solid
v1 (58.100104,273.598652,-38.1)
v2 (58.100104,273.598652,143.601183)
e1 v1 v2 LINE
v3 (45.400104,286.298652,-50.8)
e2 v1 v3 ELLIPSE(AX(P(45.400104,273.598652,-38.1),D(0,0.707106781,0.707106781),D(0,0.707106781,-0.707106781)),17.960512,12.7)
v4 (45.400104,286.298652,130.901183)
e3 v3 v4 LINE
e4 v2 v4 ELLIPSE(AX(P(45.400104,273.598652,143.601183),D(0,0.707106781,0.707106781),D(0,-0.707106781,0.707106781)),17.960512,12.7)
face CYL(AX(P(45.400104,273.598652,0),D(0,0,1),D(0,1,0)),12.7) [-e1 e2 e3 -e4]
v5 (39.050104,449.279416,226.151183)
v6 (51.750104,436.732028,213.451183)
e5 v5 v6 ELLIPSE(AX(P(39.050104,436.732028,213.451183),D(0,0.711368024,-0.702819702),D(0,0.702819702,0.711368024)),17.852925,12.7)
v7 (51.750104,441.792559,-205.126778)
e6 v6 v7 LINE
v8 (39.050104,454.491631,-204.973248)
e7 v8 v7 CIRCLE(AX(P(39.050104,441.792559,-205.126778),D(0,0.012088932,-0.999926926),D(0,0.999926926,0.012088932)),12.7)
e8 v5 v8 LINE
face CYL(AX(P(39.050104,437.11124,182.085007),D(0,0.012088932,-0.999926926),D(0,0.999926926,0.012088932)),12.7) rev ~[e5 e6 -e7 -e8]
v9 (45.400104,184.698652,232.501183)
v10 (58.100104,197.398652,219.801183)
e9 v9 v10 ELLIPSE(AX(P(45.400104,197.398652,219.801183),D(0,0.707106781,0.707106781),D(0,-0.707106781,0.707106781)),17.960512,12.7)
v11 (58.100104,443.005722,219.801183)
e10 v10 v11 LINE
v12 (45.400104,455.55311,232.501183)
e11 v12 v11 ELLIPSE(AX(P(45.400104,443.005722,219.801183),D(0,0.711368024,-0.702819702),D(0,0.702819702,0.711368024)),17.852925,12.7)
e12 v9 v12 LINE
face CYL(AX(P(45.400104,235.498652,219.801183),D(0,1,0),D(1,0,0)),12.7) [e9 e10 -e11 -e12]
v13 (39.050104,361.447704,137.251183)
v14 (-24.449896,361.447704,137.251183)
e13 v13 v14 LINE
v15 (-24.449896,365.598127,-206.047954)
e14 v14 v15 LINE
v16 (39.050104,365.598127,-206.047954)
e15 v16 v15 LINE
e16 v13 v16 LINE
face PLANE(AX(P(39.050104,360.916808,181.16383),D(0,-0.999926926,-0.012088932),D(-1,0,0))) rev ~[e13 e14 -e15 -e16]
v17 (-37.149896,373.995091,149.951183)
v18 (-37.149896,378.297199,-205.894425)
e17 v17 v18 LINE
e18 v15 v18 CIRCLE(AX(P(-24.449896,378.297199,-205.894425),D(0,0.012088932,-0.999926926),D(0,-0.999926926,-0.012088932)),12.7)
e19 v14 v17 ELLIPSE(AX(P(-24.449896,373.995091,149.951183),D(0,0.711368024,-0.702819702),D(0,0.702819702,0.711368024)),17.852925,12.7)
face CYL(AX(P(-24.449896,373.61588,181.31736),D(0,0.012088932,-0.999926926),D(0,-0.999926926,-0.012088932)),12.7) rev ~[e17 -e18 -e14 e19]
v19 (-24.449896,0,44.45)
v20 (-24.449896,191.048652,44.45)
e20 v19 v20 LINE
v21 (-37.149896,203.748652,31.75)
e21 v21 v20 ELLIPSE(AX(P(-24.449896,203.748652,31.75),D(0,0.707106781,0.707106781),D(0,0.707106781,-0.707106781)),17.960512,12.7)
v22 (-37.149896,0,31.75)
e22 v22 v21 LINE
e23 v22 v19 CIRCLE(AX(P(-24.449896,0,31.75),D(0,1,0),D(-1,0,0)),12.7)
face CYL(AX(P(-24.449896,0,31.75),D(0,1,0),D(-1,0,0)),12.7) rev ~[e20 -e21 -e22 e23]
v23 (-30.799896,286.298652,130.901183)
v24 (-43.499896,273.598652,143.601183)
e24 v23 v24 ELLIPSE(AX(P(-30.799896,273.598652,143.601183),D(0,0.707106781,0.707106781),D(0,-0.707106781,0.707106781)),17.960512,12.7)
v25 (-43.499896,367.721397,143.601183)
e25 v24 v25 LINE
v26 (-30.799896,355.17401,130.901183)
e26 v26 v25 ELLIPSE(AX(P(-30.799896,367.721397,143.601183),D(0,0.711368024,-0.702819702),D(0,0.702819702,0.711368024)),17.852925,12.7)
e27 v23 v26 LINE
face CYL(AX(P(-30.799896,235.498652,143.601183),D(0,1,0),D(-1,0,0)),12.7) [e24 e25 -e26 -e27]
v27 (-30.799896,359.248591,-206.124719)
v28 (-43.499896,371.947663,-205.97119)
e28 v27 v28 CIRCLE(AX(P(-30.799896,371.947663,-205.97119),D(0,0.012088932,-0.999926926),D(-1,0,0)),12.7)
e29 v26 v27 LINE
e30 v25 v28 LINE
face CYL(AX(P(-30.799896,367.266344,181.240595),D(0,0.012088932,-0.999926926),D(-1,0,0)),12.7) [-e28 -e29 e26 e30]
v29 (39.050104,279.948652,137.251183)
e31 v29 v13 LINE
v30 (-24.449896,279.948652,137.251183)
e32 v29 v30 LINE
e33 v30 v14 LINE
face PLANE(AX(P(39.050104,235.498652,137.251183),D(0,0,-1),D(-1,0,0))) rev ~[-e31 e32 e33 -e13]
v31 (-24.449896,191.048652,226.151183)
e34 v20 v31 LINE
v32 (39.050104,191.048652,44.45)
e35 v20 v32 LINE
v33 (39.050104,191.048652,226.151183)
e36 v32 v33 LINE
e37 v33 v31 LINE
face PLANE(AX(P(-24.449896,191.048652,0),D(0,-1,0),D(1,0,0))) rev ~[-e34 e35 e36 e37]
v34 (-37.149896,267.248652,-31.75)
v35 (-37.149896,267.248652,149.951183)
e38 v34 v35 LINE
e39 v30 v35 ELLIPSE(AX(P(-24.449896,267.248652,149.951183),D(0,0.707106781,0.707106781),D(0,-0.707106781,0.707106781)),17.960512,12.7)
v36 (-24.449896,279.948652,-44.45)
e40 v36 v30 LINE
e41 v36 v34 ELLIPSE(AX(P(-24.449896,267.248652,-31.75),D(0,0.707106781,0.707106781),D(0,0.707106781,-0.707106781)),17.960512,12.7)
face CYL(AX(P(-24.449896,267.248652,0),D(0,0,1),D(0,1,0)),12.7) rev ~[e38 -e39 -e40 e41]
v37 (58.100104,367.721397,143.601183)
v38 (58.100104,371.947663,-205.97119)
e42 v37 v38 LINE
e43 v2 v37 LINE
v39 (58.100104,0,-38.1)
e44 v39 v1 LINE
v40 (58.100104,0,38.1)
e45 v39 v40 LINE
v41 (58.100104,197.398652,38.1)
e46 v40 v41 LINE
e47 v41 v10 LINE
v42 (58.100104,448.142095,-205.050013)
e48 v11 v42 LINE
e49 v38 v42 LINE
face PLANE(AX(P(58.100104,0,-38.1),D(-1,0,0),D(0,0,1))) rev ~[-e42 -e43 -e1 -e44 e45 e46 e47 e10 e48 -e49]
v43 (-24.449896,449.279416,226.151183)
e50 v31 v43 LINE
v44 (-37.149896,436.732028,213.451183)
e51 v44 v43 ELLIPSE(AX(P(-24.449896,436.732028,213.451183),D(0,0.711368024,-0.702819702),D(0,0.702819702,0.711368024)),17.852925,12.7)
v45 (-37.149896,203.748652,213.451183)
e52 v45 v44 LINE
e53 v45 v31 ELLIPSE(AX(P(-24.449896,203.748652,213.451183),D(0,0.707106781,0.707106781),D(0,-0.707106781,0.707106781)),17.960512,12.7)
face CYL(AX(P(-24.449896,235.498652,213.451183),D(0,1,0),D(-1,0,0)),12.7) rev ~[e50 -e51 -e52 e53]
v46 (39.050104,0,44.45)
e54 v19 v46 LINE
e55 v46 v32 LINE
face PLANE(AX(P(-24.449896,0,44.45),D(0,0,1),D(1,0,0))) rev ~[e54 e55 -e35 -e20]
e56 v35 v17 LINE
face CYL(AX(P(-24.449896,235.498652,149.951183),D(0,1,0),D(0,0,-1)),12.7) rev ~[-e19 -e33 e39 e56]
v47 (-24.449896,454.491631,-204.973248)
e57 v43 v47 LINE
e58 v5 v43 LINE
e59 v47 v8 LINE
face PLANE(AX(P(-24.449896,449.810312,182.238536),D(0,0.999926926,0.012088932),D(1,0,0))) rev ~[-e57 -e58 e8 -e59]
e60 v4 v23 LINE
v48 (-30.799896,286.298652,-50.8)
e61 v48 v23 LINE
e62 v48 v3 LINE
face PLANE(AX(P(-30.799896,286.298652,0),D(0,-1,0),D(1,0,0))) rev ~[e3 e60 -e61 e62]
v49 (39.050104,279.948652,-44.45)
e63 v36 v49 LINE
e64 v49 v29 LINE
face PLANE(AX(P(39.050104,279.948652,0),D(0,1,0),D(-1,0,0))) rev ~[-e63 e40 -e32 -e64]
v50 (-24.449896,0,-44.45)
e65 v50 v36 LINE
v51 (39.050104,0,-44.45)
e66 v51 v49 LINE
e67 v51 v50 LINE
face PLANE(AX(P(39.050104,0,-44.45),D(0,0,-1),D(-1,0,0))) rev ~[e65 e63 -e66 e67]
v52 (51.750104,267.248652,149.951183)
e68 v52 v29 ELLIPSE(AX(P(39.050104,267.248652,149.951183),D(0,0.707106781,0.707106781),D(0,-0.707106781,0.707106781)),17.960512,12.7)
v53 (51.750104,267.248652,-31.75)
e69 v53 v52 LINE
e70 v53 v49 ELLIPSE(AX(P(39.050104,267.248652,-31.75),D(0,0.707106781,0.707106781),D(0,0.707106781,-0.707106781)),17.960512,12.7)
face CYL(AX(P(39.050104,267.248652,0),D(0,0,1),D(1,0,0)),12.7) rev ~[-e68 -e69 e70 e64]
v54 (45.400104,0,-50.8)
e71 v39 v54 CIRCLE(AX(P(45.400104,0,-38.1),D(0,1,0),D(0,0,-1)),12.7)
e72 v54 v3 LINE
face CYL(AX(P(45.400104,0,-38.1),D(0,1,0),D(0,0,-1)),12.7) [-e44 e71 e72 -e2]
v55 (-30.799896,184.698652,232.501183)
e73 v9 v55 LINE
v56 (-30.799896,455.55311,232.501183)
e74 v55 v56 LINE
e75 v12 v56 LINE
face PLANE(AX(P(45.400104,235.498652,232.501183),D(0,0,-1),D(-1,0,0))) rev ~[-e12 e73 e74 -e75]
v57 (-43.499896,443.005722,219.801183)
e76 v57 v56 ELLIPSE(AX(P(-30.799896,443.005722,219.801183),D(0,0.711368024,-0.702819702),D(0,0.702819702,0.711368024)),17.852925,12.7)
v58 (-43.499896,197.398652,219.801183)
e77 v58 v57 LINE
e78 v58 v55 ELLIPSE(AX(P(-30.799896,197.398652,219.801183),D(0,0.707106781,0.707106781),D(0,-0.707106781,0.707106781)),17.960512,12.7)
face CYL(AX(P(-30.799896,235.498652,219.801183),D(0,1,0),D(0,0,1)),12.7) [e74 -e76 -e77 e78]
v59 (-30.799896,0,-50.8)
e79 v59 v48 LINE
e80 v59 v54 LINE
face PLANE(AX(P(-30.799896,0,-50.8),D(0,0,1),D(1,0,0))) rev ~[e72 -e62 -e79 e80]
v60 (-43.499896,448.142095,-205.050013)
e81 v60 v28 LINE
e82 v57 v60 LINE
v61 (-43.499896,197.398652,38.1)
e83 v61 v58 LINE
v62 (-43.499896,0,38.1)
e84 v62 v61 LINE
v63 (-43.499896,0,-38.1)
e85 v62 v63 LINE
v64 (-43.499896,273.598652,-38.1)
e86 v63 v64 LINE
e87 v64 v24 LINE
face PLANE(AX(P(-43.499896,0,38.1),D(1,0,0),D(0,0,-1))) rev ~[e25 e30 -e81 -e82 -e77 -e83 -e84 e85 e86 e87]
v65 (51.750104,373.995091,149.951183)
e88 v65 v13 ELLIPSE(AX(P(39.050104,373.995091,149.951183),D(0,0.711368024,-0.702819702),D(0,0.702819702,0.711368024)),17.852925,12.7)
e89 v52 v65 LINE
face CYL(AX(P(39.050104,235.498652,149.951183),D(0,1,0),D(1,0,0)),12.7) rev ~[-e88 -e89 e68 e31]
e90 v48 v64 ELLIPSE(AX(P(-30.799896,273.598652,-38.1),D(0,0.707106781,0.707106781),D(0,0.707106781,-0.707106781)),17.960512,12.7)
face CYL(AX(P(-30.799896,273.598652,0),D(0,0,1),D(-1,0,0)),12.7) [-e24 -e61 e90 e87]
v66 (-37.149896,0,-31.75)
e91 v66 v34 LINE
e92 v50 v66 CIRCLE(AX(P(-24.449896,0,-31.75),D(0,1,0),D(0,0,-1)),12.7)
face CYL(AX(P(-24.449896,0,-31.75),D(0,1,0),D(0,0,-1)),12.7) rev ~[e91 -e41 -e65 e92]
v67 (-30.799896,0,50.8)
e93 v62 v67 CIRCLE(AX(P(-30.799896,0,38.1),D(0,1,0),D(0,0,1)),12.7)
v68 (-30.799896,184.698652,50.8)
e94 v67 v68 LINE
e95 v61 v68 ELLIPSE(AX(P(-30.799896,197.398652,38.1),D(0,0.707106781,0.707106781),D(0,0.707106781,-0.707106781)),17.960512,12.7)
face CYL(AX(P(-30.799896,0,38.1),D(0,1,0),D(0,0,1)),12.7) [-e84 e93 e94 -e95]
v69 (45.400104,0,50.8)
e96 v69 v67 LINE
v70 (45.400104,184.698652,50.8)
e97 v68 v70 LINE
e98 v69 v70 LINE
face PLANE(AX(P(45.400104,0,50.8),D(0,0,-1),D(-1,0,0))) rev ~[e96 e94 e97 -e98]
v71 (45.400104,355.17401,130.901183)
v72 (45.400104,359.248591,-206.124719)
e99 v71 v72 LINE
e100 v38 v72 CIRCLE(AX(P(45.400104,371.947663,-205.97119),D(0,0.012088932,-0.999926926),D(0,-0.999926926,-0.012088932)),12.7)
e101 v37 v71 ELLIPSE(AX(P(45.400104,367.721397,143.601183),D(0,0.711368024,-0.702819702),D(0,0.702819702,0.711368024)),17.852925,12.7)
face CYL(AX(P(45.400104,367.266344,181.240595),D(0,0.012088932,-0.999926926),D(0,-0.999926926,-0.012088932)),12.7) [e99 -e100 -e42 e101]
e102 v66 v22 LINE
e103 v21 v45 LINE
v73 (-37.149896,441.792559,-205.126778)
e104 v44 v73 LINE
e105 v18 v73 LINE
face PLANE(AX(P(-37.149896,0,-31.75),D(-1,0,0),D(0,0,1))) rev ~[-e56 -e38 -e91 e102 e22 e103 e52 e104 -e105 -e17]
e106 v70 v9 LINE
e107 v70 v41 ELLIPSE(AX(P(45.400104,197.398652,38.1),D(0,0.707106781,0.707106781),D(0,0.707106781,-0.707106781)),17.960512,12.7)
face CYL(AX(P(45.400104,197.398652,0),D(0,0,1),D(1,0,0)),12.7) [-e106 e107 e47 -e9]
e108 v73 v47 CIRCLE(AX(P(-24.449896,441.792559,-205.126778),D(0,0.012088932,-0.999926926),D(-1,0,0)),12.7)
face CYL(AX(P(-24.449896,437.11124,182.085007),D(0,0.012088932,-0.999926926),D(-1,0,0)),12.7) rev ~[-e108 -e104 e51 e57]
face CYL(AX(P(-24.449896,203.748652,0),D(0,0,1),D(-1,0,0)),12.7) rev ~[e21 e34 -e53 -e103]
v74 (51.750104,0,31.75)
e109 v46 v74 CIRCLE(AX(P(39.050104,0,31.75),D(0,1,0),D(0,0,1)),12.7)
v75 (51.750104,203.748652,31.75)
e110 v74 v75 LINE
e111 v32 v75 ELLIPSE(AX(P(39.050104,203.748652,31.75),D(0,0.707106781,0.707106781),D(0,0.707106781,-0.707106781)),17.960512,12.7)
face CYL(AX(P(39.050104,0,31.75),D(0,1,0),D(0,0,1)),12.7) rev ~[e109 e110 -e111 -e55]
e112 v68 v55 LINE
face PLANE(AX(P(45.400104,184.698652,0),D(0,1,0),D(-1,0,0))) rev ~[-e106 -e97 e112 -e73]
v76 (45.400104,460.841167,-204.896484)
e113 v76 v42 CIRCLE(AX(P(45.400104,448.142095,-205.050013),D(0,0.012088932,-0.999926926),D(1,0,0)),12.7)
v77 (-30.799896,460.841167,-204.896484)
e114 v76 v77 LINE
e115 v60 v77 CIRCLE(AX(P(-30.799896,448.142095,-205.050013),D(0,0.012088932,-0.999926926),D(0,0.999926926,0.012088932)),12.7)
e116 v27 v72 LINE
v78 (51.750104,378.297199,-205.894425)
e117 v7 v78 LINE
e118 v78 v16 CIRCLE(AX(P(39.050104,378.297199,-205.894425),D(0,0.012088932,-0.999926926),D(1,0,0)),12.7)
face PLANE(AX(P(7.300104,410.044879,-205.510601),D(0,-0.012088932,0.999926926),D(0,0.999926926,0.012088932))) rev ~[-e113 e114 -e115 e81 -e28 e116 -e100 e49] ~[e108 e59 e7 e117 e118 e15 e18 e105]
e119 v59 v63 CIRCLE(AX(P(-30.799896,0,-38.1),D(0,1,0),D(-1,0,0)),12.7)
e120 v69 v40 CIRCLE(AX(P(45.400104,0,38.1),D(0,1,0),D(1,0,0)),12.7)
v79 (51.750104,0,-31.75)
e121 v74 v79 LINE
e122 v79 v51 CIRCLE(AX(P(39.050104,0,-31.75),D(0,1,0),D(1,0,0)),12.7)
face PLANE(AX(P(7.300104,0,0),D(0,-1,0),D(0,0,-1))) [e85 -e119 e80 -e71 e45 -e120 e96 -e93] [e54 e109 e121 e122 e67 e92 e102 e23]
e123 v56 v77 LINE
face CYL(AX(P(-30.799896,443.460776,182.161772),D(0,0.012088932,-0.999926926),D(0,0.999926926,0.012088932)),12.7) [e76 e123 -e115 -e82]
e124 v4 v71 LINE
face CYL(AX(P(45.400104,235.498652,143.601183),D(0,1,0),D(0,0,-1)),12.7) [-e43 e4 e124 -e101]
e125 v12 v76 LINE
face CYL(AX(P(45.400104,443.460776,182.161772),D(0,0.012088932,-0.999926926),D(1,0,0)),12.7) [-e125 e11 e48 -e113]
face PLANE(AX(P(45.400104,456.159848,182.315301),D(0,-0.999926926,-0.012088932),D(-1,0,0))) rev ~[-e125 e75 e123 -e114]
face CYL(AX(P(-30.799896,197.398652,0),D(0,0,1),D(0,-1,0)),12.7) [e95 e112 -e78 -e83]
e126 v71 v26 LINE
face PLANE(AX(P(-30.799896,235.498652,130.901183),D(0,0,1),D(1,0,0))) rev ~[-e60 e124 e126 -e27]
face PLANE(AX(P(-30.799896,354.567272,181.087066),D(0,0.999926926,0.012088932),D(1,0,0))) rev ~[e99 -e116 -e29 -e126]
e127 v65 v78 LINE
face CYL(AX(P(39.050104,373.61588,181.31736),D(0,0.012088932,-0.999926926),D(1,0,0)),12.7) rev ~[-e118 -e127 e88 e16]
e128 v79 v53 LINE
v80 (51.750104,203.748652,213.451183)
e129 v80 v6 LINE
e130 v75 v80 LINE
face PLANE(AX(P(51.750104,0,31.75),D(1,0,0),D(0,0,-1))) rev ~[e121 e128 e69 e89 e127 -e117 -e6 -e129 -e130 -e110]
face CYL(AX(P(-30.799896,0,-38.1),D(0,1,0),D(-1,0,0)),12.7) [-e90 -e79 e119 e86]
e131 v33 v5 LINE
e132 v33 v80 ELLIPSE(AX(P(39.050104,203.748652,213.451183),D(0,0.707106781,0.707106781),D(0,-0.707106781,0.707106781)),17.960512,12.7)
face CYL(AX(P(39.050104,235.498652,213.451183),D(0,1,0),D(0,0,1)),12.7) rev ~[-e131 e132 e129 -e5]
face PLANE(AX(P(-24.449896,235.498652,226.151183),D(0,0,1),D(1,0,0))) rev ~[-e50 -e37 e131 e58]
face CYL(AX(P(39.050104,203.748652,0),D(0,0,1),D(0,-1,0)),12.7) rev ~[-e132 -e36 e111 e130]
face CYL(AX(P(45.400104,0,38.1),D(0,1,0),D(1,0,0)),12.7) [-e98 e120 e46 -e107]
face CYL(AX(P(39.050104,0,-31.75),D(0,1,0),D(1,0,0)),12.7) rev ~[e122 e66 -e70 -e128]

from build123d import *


with BuildPart() as f2:
    # F2: sweep along a path in F1
    with BuildLine(Plane.YZ) as f2_path:
        Line((0, 0), (235.4986518621, 0))
        Line((235.4986518621, 0), (235.4986518621, 181.7011833191))
        Line((235.4986518621, 181.7011833191), (405.3635597229, 181.7011833191))
        Line((405.3635597229, 181.7011833191), (410.0448787212, -205.5106014013))
    # F0 (on Front) → F2 (sweep)
    with BuildSketch(Plane.XZ):
        with BuildLine():
            Line((-43.4998961684, 38.1), (-43.4998961684, -38.1))
            ThreePointArc((-43.4998961684, -38.1), (-39.7801522895, -47.0802561211), (-30.7998961684, -50.8))
            Line((-30.7998961684, -50.8), (45.4001038316, -50.8))
            ThreePointArc((45.4001038316, -50.8), (54.3803599527, -47.0802561211), (58.1001038316, -38.1))
            Line((58.1001038316, -38.1), (58.1001038316, 38.1))
            ThreePointArc((58.1001038316, 38.1), (54.3803599527, 47.0802561211), (45.4001038316, 50.8))
            Line((45.4001038316, 50.8), (-30.7998961684, 50.8))
            ThreePointArc((-30.7998961684, 50.8), (-39.7801522895, 47.0802561211), (-43.4998961684, 38.1))
        make_face()
        with BuildLine():
            ThreePointArc((-37.1498961684, 31.75), (-33.4301522895, 40.7302561211), (-24.4498961684, 44.45))
            Line((-24.4498961684, 44.45), (39.0501038316, 44.45))
            ThreePointArc((39.0501038316, 44.45), (48.0303599527, 40.7302561211), (51.7501038316, 31.75))
            Line((51.7501038316, 31.75), (51.7501038316, -31.75))
            ThreePointArc((51.7501038316, -31.75), (48.0303599527, -40.7302561211), (39.0501038316, -44.45))
            Line((39.0501038316, -44.45), (-24.4498961684, -44.45))
            ThreePointArc((-24.4498961684, -44.45), (-33.4301522895, -40.7302561211), (-37.1498961684, -31.75))
            Line((-37.1498961684, -31.75), (-37.1498961684, 31.75))
        make_face(mode=Mode.SUBTRACT)
    sweep(path=f2_path.line, transition=Transition.RIGHT)


solid = f2.part
